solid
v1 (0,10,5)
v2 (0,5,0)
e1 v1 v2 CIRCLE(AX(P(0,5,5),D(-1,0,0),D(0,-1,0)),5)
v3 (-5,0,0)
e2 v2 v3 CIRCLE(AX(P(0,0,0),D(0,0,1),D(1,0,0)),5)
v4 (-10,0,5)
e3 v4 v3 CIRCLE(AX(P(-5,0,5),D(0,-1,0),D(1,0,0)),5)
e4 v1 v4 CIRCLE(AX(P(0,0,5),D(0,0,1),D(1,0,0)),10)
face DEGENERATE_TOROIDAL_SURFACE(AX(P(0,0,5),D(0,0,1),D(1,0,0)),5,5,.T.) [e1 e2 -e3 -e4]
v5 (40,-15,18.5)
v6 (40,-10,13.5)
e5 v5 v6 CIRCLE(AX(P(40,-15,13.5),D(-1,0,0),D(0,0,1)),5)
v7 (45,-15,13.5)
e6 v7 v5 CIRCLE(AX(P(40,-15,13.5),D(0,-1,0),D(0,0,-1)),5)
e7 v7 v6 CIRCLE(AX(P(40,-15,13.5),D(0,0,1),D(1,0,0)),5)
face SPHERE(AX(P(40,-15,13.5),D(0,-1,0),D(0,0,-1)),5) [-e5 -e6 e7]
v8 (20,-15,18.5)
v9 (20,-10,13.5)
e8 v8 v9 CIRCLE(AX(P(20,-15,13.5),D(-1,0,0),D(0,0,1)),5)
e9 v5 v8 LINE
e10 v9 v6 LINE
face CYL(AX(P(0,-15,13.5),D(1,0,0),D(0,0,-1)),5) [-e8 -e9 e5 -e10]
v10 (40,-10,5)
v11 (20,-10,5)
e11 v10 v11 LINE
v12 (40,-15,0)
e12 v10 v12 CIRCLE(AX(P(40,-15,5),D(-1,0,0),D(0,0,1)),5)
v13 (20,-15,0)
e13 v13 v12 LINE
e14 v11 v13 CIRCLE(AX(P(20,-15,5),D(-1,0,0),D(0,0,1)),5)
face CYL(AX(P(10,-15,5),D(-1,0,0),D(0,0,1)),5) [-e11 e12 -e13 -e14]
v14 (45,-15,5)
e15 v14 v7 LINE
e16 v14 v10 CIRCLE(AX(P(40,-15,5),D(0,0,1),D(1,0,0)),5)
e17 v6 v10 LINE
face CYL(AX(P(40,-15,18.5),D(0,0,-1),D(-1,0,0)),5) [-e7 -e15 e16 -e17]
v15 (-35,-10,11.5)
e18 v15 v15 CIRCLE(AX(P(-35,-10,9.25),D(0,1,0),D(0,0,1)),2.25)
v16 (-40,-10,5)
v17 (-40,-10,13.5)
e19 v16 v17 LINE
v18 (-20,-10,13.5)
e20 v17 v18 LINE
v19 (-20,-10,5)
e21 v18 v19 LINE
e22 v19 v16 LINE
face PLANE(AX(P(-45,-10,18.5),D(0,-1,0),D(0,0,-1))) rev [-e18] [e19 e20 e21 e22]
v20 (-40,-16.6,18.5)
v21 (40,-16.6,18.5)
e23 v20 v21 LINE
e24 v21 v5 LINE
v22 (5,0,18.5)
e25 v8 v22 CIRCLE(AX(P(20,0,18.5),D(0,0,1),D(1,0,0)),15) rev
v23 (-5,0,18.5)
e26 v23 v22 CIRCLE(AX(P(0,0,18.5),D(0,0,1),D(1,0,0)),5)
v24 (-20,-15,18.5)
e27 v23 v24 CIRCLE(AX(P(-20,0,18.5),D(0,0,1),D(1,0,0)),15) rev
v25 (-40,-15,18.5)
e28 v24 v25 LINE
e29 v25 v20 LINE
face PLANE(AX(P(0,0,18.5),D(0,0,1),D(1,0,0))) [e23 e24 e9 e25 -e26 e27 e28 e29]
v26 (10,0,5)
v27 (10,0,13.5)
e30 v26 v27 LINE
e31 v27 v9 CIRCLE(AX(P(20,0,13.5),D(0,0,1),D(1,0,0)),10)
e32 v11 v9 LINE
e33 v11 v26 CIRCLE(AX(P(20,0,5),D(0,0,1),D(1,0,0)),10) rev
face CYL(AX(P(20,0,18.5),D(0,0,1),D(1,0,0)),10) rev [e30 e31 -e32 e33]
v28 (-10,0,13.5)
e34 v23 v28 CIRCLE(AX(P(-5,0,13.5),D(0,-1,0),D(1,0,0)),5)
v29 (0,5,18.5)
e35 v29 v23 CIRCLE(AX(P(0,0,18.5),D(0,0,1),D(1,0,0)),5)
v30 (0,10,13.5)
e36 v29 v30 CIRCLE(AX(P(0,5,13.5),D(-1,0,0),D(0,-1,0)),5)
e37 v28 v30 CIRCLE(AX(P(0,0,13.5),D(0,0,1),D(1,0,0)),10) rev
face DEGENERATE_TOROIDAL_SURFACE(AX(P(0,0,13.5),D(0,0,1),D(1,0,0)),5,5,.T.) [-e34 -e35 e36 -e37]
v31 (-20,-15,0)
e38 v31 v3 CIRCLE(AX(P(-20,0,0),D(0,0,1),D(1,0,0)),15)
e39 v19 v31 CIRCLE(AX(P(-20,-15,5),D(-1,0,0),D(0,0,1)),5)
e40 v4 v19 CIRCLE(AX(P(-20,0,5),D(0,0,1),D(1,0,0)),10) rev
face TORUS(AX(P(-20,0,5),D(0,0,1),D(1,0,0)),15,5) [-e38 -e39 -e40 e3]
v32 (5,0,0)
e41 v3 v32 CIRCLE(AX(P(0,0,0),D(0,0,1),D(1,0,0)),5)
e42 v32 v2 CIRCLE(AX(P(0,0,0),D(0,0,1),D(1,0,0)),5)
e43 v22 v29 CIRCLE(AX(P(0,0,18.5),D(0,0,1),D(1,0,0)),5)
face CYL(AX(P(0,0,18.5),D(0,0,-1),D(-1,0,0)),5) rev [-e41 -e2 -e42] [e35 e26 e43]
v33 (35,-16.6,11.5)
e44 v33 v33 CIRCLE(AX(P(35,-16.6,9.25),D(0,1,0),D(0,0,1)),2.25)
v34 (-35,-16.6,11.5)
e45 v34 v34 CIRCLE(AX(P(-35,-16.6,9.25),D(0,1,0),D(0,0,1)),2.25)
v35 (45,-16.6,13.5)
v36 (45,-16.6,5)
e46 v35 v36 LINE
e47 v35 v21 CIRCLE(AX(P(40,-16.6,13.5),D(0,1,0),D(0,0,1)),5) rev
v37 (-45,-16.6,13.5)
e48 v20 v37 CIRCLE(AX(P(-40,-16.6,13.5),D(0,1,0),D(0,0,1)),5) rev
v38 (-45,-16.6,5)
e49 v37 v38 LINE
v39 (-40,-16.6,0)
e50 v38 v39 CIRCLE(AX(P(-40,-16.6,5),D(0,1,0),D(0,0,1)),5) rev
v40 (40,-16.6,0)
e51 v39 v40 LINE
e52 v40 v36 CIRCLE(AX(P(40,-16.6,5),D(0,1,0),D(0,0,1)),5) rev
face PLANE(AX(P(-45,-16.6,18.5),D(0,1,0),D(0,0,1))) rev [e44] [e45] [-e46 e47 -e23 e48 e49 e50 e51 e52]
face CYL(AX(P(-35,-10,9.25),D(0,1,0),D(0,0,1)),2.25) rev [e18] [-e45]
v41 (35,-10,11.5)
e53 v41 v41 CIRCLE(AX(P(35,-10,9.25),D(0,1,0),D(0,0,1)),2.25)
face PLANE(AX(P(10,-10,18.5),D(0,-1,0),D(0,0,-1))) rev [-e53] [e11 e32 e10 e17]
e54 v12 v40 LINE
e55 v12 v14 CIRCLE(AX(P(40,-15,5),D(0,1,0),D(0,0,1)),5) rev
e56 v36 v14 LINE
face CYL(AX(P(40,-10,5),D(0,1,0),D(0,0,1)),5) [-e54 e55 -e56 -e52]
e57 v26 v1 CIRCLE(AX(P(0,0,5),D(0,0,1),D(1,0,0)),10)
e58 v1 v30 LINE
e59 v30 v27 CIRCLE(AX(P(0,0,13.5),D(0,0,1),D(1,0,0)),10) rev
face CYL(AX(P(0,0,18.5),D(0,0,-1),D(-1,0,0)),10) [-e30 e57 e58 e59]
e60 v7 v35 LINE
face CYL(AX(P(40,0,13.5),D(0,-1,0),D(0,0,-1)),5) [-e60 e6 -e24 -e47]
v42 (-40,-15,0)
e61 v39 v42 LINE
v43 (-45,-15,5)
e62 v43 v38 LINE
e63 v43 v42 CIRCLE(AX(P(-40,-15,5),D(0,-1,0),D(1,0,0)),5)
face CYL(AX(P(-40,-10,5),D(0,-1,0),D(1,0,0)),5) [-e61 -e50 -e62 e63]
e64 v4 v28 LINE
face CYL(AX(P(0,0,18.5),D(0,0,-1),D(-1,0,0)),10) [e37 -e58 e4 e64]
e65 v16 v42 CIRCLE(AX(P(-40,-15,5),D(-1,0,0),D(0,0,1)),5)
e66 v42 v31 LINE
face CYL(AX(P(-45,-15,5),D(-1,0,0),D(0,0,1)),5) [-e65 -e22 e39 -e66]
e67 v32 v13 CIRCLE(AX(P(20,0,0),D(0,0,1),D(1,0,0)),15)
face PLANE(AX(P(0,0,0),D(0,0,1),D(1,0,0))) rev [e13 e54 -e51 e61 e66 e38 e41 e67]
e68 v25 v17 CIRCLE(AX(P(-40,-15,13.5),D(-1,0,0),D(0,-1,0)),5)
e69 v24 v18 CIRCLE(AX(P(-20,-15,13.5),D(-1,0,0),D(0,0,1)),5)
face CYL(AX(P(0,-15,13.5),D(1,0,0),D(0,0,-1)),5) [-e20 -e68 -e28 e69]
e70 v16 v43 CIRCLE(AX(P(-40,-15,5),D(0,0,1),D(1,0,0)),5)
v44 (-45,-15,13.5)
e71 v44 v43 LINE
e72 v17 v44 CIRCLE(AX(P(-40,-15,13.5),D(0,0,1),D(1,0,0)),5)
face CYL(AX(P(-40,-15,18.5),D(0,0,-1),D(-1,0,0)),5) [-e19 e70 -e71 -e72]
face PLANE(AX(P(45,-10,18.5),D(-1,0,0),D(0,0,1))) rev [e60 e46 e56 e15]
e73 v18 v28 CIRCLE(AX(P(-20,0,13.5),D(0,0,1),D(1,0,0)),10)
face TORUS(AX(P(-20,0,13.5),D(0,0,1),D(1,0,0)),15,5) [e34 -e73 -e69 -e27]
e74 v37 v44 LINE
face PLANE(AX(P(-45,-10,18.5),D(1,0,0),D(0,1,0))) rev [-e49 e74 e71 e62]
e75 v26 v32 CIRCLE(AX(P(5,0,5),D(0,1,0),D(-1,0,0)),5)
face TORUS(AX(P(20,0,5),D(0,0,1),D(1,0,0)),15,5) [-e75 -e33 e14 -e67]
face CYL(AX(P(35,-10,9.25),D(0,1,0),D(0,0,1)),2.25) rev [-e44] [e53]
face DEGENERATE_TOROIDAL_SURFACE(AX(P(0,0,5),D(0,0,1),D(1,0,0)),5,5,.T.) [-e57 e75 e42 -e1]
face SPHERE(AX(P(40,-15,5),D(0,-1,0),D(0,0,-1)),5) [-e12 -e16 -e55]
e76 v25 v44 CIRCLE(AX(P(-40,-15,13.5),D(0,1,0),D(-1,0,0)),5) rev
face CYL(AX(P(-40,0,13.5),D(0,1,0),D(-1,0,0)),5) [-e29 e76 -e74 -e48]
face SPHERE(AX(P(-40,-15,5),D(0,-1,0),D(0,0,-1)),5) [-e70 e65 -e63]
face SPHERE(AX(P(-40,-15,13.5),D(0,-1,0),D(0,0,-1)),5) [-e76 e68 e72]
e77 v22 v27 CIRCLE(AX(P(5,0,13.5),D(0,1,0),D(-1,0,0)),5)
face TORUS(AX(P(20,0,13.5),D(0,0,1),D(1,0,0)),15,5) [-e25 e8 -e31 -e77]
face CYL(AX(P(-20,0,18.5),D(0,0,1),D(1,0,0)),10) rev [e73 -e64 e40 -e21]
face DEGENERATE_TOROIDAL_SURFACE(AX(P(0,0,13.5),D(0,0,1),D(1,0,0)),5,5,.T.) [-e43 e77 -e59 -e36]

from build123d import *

# Parameters (mm, degrees)
SKETCH1_R            = 5
BOSS_EXTRUDE1_DEPTH  = 18.5
FILLET1_DEPTH        = 18.5
FILLET1_2_DEPTH      = 18.5
M4_CLEARANCE_HOLE1_D = 4.5
FILLET3_R            = 5
FILLET2_R            = 5


with BuildPart() as part:
    # Sketch1 → Boss-Extrude1 (new body)
    with BuildSketch(Plane.XY):
        Polygon((10, -10), (45, -10), (45, -16.6), (-45, -16.6), (-45, -10), (-10, -10), (-10, 10), (10, 10), align=None)
        Circle(SKETCH1_R, mode=Mode.SUBTRACT)
    extrude(amount=BOSS_EXTRUDE1_DEPTH)

    # Fillet1: read off the stored shape, not the designer's step
    # Fillet1 outline → Fillet1 (cut)
    with BuildSketch(Plane.XY):
        with BuildLine():
            Line((10, 10), (0, 10))
            ThreePointArc((0, 10), (7.071067812, 7.071067812), (10, 0))
            Line((10, 0), (10, 10))
        make_face()
        with BuildLine():
            Line((-10, 10), (-10, 0))
            ThreePointArc((-10, 0), (-7.071067812, 7.071067812), (0, 10))
            Line((0, 10), (-10, 10))
        make_face()
    extrude(amount=FILLET1_DEPTH, mode=Mode.SUBTRACT)

    # Fillet1 2 outline → Fillet1 2 (add)
    with BuildSketch(Plane.XY):
        with BuildLine():
            ThreePointArc((20, -10), (12.928932188, -7.071067812), (10, 0))
            Line((10, 0), (10, -10))
            Line((10, -10), (20, -10))
        make_face()
        with BuildLine():
            ThreePointArc((-10, 0), (-12.928932188, -7.071067812), (-20, -10))
            Line((-20, -10), (-10, -10))
            Line((-10, -10), (-10, 0))
        make_face()
    extrude(amount=FILLET1_2_DEPTH)

    # M4 Clearance Hole1 (through all)
    with Locations(Plane(origin=(0, -10, 0), x_dir=(1, 0, 0), z_dir=(0, 1, 0))):
        with Locations((-35, -9.25), (35, -9.25)):
            Hole(M4_CLEARANCE_HOLE1_D / 2)

    # Fillet3
    fillet3_edges = [part.edges().sort_by_distance(p)[0] for p in [
        (-45, -13.3, 0),
        (-45, -13.3, 18.5),
        (45, -13.3, 18.5),
        (45, -13.3, 0),
    ]]
    fillet(fillet3_edges, radius=FILLET3_R)

    # Fillet2
    fillet2_edges = [part.edges().sort_by_distance(p)[0] for p in [
        (-30, -10, 0),
        (-30, -10, 18.5),
        (-7.071067812, 7.071067812, 0),
        (7.071067812, 7.071067812, 0),
        (-7.071067812, 7.071067812, 18.5),
        (7.071067812, 7.071067812, 18.5),
        (12.928932188, -7.071067812, 0),
        (12.928932188, -7.071067812, 18.5),
        (-12.928932188, -7.071067812, 0),
        (-12.928932188, -7.071067812, 18.5),
        (30, -10, 18.5),
        (-45, -10, 9.25),
        (-43.535533906, -10, 1.464466094),
        (-43.535533906, -10, 17.035533906),
        (30, -10, 0),
        (45, -10, 9.25),
        (43.535533906, -10, 1.464466094),
        (43.535533906, -10, 17.035533906),
    ]]
    fillet(fillet2_edges, radius=FILLET2_R - 0.0001)  # a hair under: the kernel refuses the full size


solid = part.part
